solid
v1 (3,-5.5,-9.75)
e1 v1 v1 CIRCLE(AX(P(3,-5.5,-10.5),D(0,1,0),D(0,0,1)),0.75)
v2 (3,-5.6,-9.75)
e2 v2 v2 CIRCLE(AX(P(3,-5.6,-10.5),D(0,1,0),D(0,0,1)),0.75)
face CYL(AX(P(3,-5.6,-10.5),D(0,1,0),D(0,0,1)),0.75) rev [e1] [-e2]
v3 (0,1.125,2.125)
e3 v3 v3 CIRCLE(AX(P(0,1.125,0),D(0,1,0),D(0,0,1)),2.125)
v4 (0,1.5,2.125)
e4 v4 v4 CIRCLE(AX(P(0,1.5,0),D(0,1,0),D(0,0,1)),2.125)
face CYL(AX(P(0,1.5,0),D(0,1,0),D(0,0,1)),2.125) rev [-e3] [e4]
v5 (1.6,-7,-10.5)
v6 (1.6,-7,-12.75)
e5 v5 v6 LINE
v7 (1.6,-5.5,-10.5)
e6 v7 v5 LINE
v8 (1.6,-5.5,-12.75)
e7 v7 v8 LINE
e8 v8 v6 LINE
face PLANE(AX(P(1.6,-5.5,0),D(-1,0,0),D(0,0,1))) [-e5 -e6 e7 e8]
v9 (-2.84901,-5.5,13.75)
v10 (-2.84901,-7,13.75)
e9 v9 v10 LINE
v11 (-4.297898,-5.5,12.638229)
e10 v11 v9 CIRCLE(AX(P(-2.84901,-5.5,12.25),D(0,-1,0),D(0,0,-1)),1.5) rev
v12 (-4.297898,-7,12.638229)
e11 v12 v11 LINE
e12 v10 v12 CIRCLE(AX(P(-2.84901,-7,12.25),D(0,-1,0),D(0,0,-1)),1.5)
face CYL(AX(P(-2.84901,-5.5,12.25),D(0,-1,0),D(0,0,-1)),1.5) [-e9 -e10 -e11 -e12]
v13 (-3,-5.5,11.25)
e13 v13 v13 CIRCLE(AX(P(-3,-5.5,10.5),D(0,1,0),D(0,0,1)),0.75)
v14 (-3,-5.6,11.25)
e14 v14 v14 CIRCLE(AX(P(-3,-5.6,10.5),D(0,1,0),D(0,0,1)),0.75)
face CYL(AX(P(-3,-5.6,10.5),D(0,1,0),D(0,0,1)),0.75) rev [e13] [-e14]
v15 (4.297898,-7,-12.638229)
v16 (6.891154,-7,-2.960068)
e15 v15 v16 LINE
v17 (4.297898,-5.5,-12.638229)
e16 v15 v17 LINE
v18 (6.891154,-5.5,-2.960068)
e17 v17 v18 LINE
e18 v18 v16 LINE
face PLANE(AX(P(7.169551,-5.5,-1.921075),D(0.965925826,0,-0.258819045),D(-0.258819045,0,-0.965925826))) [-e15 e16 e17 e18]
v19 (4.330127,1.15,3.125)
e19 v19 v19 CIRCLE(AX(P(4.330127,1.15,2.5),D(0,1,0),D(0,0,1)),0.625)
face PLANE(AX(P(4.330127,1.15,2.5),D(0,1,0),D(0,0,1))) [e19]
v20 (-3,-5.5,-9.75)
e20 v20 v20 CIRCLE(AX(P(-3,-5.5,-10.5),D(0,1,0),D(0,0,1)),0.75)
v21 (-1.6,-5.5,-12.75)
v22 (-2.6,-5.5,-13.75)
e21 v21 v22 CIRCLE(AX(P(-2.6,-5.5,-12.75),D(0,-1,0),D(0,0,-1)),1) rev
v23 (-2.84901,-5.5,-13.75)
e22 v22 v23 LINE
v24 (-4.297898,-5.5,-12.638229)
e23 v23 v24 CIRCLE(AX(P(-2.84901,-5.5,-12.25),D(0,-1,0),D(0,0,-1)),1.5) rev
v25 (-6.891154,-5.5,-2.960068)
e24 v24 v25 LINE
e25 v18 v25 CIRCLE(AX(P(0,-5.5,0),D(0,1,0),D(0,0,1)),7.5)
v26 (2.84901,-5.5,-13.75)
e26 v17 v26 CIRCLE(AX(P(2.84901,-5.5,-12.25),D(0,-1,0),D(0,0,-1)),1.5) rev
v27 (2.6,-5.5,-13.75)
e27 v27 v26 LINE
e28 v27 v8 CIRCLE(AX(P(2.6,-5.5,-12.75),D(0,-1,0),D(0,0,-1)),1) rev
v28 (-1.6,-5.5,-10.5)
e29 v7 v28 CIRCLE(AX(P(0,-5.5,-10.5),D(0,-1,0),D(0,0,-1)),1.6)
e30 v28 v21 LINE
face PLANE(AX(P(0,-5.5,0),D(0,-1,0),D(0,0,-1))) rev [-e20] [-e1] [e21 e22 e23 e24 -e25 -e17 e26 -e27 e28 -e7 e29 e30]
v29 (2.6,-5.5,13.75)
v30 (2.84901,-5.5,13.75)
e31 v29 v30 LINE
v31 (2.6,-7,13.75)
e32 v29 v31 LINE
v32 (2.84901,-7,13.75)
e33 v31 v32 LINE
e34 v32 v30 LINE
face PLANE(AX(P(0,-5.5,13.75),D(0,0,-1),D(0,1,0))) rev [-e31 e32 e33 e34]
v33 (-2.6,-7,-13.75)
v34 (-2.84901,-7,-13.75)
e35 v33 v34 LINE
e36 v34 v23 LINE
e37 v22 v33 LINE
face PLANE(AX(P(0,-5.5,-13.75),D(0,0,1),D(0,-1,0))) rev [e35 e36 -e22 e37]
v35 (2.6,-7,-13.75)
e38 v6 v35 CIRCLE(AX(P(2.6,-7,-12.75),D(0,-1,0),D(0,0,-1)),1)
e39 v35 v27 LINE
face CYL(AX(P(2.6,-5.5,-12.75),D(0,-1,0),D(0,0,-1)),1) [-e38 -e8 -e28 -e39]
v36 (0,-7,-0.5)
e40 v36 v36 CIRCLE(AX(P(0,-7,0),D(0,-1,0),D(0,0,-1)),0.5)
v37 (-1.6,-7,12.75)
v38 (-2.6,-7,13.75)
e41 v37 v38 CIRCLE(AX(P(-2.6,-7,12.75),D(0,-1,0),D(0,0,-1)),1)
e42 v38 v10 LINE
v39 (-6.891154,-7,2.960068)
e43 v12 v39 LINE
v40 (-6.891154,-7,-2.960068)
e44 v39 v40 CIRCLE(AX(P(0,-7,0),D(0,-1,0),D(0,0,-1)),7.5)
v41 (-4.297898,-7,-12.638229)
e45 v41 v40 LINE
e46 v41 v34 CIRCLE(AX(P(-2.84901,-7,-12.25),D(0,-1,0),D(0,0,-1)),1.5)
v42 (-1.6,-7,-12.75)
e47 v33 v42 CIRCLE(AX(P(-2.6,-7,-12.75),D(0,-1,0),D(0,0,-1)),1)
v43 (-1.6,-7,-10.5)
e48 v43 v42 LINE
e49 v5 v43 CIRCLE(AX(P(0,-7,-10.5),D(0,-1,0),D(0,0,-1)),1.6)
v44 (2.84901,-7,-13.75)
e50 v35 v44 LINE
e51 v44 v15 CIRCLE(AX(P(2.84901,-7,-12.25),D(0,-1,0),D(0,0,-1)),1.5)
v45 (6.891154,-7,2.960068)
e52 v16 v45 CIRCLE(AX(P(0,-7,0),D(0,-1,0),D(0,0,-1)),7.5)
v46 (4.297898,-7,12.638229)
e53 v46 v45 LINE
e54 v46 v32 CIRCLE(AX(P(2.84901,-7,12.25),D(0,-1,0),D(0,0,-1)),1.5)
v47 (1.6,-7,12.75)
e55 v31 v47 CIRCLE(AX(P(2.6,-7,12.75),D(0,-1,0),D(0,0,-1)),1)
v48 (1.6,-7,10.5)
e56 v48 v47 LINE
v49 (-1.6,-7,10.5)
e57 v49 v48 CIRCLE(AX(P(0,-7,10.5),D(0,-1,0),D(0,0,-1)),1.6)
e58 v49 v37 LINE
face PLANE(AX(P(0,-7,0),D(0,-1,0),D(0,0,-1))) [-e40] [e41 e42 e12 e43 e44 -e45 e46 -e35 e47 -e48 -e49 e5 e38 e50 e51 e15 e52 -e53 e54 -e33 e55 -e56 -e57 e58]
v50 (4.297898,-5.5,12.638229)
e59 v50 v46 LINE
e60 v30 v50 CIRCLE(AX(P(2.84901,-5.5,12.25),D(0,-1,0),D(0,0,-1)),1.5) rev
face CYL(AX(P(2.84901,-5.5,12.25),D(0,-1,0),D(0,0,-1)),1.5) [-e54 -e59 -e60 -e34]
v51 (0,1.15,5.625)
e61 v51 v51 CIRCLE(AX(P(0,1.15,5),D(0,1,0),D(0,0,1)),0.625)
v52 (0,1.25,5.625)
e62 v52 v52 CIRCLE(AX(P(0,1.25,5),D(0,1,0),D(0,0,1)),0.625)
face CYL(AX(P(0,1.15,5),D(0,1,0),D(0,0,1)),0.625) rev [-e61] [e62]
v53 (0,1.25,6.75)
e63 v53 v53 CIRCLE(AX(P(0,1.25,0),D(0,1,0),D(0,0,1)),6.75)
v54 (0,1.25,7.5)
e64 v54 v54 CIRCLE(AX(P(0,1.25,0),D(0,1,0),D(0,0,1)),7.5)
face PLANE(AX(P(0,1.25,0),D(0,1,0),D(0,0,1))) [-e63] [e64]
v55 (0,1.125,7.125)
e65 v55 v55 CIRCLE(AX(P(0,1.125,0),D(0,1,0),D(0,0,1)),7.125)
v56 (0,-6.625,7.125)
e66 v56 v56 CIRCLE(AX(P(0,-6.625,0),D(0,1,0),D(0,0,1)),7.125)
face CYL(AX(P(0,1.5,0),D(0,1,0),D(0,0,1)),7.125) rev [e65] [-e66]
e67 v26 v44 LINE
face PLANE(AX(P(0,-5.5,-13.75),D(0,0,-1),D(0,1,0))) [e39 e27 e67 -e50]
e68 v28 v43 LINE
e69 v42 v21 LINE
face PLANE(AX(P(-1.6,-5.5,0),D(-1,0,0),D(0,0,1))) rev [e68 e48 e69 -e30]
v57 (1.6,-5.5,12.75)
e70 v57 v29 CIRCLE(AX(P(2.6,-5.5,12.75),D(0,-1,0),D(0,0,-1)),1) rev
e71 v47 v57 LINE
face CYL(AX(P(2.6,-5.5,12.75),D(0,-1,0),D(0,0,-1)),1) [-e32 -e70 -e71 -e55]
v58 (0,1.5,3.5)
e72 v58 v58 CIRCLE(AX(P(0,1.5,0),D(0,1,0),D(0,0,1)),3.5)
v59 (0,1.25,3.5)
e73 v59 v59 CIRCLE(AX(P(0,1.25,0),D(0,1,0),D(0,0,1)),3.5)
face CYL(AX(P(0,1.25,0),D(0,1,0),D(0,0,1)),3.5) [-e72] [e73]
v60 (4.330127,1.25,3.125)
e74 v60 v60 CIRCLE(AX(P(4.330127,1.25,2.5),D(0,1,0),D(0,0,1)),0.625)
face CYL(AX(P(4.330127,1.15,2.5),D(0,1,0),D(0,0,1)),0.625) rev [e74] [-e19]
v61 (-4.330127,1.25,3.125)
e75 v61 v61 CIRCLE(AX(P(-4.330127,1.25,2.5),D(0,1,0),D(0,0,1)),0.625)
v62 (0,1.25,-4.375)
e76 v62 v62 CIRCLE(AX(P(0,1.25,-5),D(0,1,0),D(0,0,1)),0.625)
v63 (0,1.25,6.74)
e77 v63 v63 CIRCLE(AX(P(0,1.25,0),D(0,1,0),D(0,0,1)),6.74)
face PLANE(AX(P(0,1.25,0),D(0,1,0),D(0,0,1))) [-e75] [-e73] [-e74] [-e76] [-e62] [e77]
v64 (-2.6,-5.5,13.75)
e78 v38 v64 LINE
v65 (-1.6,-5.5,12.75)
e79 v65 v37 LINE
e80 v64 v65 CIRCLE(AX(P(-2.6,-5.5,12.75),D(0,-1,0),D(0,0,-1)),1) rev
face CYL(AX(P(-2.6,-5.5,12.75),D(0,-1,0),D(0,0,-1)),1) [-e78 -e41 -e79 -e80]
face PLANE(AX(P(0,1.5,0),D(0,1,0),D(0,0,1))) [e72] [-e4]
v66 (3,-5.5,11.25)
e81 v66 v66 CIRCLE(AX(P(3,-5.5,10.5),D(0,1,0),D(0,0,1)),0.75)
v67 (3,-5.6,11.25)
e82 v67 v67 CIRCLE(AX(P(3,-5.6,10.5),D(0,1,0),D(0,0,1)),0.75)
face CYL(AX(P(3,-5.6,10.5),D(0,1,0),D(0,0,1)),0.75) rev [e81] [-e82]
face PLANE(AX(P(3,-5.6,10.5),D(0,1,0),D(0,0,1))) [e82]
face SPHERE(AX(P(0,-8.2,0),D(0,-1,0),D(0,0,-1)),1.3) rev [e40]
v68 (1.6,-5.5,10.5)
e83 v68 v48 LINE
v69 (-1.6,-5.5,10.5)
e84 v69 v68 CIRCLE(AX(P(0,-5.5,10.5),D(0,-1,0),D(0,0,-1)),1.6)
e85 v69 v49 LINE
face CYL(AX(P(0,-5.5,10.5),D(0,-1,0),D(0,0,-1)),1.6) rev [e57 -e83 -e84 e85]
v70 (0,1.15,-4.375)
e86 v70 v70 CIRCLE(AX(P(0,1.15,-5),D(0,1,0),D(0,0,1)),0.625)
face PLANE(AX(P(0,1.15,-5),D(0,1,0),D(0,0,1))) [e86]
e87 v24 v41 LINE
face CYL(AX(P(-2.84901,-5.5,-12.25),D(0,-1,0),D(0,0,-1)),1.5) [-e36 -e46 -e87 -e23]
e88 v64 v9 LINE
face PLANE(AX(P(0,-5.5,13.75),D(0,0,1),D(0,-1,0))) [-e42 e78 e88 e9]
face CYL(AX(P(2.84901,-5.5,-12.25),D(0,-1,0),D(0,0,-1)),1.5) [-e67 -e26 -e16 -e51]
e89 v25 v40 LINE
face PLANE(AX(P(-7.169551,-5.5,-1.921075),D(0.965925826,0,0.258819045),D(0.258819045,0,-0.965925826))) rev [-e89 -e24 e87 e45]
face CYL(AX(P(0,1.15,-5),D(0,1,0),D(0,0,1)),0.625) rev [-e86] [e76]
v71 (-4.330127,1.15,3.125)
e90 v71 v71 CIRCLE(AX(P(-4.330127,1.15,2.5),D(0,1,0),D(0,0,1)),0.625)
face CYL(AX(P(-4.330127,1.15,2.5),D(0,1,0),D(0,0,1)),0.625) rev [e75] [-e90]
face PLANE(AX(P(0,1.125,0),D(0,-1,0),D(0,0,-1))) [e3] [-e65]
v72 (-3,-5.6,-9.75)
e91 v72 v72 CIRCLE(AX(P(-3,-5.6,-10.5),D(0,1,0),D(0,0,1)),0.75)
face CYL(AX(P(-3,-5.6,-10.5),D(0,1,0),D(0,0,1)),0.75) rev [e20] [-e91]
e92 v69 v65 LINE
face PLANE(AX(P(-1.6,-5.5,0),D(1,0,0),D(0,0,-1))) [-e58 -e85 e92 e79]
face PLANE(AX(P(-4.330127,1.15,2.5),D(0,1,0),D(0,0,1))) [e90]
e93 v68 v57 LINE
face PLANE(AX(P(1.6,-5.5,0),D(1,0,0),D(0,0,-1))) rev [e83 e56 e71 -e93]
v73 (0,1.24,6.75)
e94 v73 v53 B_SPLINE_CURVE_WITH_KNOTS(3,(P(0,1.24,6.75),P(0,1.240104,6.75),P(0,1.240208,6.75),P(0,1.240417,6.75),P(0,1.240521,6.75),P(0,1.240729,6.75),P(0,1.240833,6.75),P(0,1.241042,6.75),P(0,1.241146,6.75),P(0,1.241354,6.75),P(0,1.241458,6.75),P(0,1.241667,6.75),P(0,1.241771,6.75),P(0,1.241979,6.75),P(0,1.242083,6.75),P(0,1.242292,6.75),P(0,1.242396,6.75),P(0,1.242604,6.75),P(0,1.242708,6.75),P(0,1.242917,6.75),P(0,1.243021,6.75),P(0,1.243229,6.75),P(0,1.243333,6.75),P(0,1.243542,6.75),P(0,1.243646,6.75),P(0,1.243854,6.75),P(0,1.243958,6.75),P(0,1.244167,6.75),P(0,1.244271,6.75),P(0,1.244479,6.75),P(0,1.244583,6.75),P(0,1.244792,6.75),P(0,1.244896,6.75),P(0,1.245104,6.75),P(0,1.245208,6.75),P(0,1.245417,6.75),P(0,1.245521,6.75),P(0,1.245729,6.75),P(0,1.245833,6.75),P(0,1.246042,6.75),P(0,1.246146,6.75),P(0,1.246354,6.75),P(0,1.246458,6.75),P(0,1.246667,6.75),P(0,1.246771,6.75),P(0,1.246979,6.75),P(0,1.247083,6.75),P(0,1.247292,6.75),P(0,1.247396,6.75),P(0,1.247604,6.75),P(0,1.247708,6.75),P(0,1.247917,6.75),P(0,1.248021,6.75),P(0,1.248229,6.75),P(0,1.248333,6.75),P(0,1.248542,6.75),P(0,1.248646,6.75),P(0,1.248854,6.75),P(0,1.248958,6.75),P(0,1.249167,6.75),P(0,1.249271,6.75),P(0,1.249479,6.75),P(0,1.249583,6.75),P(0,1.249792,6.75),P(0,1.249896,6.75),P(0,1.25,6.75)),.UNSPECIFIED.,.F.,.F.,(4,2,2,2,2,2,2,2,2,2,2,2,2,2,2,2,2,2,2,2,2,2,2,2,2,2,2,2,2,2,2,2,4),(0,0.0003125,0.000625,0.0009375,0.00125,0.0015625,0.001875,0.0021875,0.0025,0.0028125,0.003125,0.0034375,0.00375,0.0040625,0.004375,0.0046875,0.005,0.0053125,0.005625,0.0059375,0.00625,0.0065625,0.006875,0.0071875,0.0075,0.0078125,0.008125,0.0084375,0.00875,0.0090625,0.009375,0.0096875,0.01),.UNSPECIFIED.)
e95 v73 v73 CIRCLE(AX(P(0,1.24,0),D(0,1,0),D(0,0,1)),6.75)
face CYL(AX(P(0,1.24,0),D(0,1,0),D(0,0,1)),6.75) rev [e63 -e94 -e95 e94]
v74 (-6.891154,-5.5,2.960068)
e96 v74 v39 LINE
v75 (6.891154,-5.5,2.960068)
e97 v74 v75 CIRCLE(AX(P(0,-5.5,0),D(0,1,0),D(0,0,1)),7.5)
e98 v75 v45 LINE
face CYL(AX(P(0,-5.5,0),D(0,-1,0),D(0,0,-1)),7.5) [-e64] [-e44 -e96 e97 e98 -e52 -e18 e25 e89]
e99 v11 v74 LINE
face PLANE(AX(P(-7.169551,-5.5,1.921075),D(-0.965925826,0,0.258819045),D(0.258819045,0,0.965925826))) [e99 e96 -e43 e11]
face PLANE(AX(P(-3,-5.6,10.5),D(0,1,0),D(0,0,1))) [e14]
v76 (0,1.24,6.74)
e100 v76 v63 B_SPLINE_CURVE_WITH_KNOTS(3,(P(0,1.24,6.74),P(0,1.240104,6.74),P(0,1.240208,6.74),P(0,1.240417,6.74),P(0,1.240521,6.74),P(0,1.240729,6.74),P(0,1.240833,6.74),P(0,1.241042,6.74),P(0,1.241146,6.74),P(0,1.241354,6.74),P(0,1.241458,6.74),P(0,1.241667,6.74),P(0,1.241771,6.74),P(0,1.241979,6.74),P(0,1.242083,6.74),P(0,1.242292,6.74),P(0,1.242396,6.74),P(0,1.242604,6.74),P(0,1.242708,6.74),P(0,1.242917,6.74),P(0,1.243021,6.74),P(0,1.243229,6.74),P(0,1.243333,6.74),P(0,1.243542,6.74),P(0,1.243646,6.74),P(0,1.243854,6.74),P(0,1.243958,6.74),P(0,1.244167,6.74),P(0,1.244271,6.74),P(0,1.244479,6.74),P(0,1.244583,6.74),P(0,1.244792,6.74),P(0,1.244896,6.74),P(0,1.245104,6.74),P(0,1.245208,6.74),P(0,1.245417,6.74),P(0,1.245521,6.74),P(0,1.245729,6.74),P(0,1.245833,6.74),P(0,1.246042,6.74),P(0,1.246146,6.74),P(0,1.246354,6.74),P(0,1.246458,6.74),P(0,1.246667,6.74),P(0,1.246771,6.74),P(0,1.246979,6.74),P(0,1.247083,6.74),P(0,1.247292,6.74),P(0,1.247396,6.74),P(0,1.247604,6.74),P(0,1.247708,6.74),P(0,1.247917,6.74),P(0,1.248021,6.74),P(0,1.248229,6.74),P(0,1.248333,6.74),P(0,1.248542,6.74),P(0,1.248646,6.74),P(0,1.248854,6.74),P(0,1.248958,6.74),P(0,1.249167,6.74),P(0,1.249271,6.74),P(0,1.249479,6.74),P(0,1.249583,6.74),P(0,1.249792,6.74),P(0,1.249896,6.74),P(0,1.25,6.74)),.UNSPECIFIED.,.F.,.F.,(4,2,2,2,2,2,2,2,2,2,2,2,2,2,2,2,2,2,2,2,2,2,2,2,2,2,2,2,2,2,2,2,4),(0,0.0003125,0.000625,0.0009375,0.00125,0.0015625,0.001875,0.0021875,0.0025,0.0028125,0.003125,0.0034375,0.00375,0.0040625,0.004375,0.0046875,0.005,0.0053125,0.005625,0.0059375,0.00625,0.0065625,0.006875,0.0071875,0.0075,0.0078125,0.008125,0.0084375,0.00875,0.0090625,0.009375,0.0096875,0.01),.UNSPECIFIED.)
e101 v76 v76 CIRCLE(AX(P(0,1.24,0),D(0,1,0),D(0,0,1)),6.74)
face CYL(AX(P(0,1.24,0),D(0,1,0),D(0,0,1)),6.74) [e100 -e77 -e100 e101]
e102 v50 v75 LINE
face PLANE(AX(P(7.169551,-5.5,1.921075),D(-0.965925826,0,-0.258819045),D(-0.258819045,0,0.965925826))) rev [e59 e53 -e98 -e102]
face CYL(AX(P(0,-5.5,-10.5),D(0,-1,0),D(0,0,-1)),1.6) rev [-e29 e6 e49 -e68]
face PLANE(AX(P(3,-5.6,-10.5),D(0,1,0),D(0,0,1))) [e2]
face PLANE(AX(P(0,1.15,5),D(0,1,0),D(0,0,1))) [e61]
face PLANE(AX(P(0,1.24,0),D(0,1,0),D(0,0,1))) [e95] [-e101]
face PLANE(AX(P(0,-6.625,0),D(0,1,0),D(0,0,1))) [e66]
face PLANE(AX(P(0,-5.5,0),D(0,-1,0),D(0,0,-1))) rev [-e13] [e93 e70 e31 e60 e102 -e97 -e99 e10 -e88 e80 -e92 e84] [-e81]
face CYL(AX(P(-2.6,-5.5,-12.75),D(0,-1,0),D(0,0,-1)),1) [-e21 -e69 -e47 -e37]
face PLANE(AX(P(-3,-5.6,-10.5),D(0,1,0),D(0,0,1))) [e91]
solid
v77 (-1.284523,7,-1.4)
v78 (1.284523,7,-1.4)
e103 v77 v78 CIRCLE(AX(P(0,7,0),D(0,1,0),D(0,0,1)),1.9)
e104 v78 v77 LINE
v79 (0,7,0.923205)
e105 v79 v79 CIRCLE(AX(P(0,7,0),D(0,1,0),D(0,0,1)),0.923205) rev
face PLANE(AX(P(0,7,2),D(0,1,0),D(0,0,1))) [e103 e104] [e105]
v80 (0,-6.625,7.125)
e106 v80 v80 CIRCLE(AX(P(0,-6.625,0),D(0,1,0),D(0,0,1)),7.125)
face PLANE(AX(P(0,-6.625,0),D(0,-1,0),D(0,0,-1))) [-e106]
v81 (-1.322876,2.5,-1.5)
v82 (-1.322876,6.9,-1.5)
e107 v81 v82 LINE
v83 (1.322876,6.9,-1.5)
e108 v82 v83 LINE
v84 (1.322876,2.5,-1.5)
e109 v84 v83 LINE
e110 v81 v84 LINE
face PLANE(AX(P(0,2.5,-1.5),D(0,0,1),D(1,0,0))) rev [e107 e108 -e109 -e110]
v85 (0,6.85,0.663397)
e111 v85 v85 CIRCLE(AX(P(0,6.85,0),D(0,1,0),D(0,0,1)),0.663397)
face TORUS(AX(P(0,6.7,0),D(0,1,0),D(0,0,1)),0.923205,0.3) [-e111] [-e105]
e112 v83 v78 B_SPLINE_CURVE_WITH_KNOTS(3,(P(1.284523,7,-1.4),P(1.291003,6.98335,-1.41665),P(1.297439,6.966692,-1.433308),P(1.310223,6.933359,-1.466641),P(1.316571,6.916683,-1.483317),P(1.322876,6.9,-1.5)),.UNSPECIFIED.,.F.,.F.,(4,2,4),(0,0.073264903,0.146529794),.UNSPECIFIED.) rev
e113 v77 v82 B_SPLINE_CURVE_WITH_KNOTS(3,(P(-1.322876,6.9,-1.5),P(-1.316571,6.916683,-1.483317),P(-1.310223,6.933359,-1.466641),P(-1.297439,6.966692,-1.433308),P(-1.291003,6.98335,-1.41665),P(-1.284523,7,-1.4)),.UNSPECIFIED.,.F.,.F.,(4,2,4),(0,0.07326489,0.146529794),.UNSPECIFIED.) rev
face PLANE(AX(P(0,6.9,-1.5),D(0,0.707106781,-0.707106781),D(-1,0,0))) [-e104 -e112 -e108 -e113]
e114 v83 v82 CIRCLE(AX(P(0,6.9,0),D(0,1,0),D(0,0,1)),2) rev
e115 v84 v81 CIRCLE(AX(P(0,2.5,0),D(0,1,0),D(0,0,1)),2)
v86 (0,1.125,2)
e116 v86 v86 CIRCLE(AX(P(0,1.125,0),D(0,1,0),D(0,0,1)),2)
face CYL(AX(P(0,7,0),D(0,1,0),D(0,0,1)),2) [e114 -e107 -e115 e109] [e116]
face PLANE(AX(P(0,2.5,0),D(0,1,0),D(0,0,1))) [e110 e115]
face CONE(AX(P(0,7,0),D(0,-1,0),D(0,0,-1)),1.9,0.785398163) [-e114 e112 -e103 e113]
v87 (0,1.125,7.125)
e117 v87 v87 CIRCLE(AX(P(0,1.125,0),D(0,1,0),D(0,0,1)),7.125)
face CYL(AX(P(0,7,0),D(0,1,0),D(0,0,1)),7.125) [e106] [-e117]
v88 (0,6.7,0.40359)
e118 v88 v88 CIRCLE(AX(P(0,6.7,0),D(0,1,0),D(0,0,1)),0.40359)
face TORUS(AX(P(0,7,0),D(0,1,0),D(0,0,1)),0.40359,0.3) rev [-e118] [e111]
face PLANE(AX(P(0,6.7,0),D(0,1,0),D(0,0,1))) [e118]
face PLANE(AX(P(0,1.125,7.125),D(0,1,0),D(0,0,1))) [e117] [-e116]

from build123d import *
from build123d.topology import SkipClean

# Parameters (mm, degrees)
SKETCH3_R           = 7.5
BOSS_EXTRUDE1_DEPTH = 1.5
SKETCH12_R          = 7.5
BOSS_EXTRUDE3_DEPTH = 7
CUT_EXTRUDE2_START  = -4.5
CUT_EXTRUDE2_DEPTH  = 4.5
CHAMFER1_SIZE       = 0.1
CUT_EXTRUDE3_START  = -0.25
SKETCH9_R           = 7.5
SKETCH9_R_2         = 3.5
CUT_EXTRUDE3_DEPTH  = 0.25
SKETCH13_R          = 0.625
CUT_EXTRUDE6_DEPTH  = 0.1
FILLET3_R           = 1.5
FILLET4_R           = 1
SKETCH10_R          = 0.75
CUT_EXTRUDE4_DEPTH  = 0.3
CUT_EXTRUDE4_DRAFT  = -30
SKETCH15_R          = 6.75
SKETCH15_R_2        = 6.74
CUT_EXTRUDE7_DEPTH  = 0.01
FILLET2_R           = 0.3
SKETCH11_R          = 0.75
CUT_EXTRUDE5_DEPTH  = 0.1


with BuildPart() as part:
    # Sketch3 → Boss-Extrude1 (new body)
    with BuildSketch(Plane(origin=(0, -7, -13.75), x_dir=(-1, 0, 0), z_dir=(0, -1, 0))):
        with BuildLine():
            Line((1.6, -27.5), (4, -27.5))
            Line((4, -27.5), (6.89115357, -16.710067986))
            ThreePointArc((6.89115357, -16.710067986), (0, -21.25), (-6.89115357, -16.710067986))
            Line((-6.89115357, -16.710067986), (-4, -27.5))
            Line((-4, -27.5), (-1.6, -27.5))
            Line((-1.6, -27.5), (-1.6, -24.25))
            ThreePointArc((-1.6, -24.25), (0, -22.65), (1.6, -24.25))
            Line((1.6, -24.25), (1.6, -27.5))
        make_face()
        with Locations((0, -13.75)):
            Circle(SKETCH3_R)
        with BuildLine():
            Line((-4, 0), (-6.89115357, -10.789932014))
            ThreePointArc((-6.89115357, -10.789932014), (0, -6.25), (6.89115357, -10.789932014))
            Line((6.89115357, -10.789932014), (4, 0))
            Line((4, 0), (1.6, 0))
            Line((1.6, 0), (1.6, -3.25))
            ThreePointArc((1.6, -3.25), (0, -4.85), (-1.6, -3.25))
            Line((-1.6, -3.25), (-1.6, 0))
            Line((-1.6, 0), (-4, 0))
        make_face()
    extrude(amount=-BOSS_EXTRUDE1_DEPTH)

    # Sketch12 → Boss-Extrude3 (add)
    with SkipClean():  # the faces are left unmerged after this step: merging them gives an invalid solid
        with BuildSketch(Plane(origin=(0, -5.5, 0), x_dir=(1, 0, 0), z_dir=(0, 1, 0))):
            with Locations(Location((0, 0, 0), (0, 0, 23.245751798))):
                Circle(SKETCH12_R)
        extrude(amount=BOSS_EXTRUDE3_DEPTH)
    add(part.part.scale(1), mode=Mode.REPLACE)  # the faces are merged on a copy

    # Sketch6 → Cut-Revolve1 (revolve, cut)
    with BuildSketch(Plane(origin=(0, 0, 0), x_dir=(0, 0, -1), z_dir=(1, 0, 0))):
        Polygon((0, -6.625), (-7.125, -6.625), (-7.125, 1.125), (-2.125, 1.125), (-2.125, 1.5), (0, 1.5), align=None)
    revolve(axis=Axis((0, 1.5, 0), (0, -1, 0)), mode=Mode.SUBTRACT)

    # Sketch9 → Cut-Extrude3 (cut)
    with BuildSketch(Plane(origin=(0, 1.5, 0), x_dir=(1, 0, 0), z_dir=(0, 1, 0)).offset(CUT_EXTRUDE3_START)):
        with Locations(Location((0, 0, 0), (0, 0, 23.245751798))):
            Circle(SKETCH9_R)
        with Locations(Location((0, 0, 0), (0, 0, 270))):
            Circle(SKETCH9_R_2, mode=Mode.SUBTRACT)
    extrude(amount=CUT_EXTRUDE3_DEPTH, mode=Mode.SUBTRACT)

    # Sketch13 → Cut-Extrude6 (cut)
    with BuildSketch(Plane(origin=(0, 1.25, 0), x_dir=(1, 0, 0), z_dir=(0, 1, 0))):
        with Locations(Location((0, 5, 0), (0, 0, 270))):
            Circle(SKETCH13_R)
        with Locations(Location((4.330127019, -2.5, 0), (0, 0, 270))):
            Circle(SKETCH13_R)
        with Locations(Location((-4.330127019, -2.5, 0), (0, 0, 270))):
            Circle(SKETCH13_R)
        with Locations(Location((0, -5, 0), (0, 0, 270))):
            Circle(SKETCH13_R)
    extrude(amount=-CUT_EXTRUDE6_DEPTH, mode=Mode.SUBTRACT)

    # Fillet3
    fillet3_edges = [part.edges().sort_by_distance(p)[0] for p in [
        (4, -6.25, 13.75),
        (4, -6.25, -13.75),
        (-4, -6.25, -13.75),
        (-4, -6.25, 13.75),
    ]]
    fillet(fillet3_edges, radius=FILLET3_R)

    # Fillet4
    fillet4_edges = [part.edges().sort_by_distance(p)[0] for p in [
        (1.6, -6.25, 13.75),
        (1.6, -6.25, -13.75),
        (-1.6, -6.25, -13.75),
        (-1.6, -6.25, 13.75),
    ]]
    fillet(fillet4_edges, radius=FILLET4_R)

    # Sketch15 → Cut-Extrude7 (cut)
    with BuildSketch(Plane(origin=(0, 1.25, 0), x_dir=(1, 0, 0), z_dir=(0, 1, 0))):
        with Locations(Location((0, 0, 0), (0, 0, 270))):
            Circle(SKETCH15_R)
        with Locations(Location((0, 0, 0), (0, 0, 270))):
            Circle(SKETCH15_R_2, mode=Mode.SUBTRACT)
    extrude(amount=-CUT_EXTRUDE7_DEPTH, mode=Mode.SUBTRACT)

    # Sketch11 → Cut-Extrude5 (cut)
    with BuildSketch(Plane(origin=(0, -5.5, 0), x_dir=(1, 0, 0), z_dir=(0, 1, 0))):
        with Locations(Location((3, 10.5, 0), (0, 0, 270))):
            Circle(SKETCH11_R)
        with Locations(Location((-3, 10.5, 0), (0, 0, 270))):
            Circle(SKETCH11_R)
        with Locations(Location((3, -10.5, 0), (0, 0, 270))):
            Circle(SKETCH11_R)
        with Locations(Location((-3, -10.5, 0), (0, 0, 270))):
            Circle(SKETCH11_R)
    extrude(amount=-CUT_EXTRUDE5_DEPTH, mode=Mode.SUBTRACT)

    # Sketch16 → Cut-Revolve2 (revolve, cut)
    with BuildSketch(Plane(origin=(0, 0, 0), x_dir=(0, 0, -1), z_dir=(1, 0, 0))):
        with BuildLine():
            Line((0, -7), (0, -6.9))
            ThreePointArc((0, -6.9), (-0.254950976, -6.925245122), (-0.5, -7))
            Line((-0.5, -7), (0, -7))
        make_face()
    revolve(axis=Axis((0, -7, 0), (0, 1, 0)), mode=Mode.SUBTRACT)


with BuildPart() as body_2:
    # Sketch7 → Revolve1 (revolve)
    with BuildSketch(Plane(origin=(0, 0, 0), x_dir=(0, 0, -1), z_dir=(1, 0, 0))):
        Polygon((0, 7), (0, -6.625), (-7.125, -6.625), (-7.125, 1.125), (-2, 1.125), (-2, 7), align=None)
    revolve(axis=Axis((0, 7, 0), (0, -1, 0)))

    # Sketch8 → Cut-Extrude2 (cut)
    with BuildSketch(Plane(origin=(0, 7, 0), x_dir=(1, 0, 0), z_dir=(0, 1, 0)).offset(CUT_EXTRUDE2_START)):
        Polygon((-46.559540358, 1.5), (-1.322875656, 1.5), (1.322875656, 1.5), (46.559540358, 1.5), (46.559540358, 91.973329404), (-46.559540358, 91.973329404), align=None)
    extrude(amount=CUT_EXTRUDE2_DEPTH, mode=Mode.SUBTRACT)

    # Chamfer1
    chamfer1_edges = [body_2.edges().sort_by_distance(p)[0] for p in [
        (1.870828693, 7, 0.707106781),
        (0, 7, -1.5),
    ]]
    chamfer(chamfer1_edges, length=CHAMFER1_SIZE)


with BuildPart() as cut_extrude4_tool:
    # Sketch10 → Cut-Extrude4 (with draft: the straight prism first)
    with BuildSketch(Plane(origin=(0, 7, 0), x_dir=(1, 0, 0), z_dir=(0, 1, 0))):
        Circle(SKETCH10_R)
    extrude(amount=-CUT_EXTRUDE4_DEPTH)
    # Cut-Extrude4: the draft: its side faces are tilted about the plane it starts from
    cut_extrude4_sides = [cut_extrude4_tool.faces().sort_by_distance(p)[0] for p in [
        (-0.75, 6.85, 0),
    ]]
    draft(cut_extrude4_sides, Plane(origin=(0, 7, 0), x_dir=(1, 0, 0), z_dir=(0, 1, 0)), CUT_EXTRUDE4_DRAFT)


with BuildPart() as body_2_1:
    add(body_2.part)

    # Cut-Extrude4: cut by cut_extrude4_tool
    add(cut_extrude4_tool.part, mode=Mode.SUBTRACT)

    # Fillet2
    fillet2_edges = [body_2_1.edges().sort_by_distance(p)[0] for p in [
        (-0.576794919, 6.7, 0),
        (-0.75, 7, 0),
    ]]
    fillet(fillet2_edges, radius=FILLET2_R - 0.0001)  # a hair under: the kernel refuses the full size


solid = Compound([part.part, body_2_1.part])
